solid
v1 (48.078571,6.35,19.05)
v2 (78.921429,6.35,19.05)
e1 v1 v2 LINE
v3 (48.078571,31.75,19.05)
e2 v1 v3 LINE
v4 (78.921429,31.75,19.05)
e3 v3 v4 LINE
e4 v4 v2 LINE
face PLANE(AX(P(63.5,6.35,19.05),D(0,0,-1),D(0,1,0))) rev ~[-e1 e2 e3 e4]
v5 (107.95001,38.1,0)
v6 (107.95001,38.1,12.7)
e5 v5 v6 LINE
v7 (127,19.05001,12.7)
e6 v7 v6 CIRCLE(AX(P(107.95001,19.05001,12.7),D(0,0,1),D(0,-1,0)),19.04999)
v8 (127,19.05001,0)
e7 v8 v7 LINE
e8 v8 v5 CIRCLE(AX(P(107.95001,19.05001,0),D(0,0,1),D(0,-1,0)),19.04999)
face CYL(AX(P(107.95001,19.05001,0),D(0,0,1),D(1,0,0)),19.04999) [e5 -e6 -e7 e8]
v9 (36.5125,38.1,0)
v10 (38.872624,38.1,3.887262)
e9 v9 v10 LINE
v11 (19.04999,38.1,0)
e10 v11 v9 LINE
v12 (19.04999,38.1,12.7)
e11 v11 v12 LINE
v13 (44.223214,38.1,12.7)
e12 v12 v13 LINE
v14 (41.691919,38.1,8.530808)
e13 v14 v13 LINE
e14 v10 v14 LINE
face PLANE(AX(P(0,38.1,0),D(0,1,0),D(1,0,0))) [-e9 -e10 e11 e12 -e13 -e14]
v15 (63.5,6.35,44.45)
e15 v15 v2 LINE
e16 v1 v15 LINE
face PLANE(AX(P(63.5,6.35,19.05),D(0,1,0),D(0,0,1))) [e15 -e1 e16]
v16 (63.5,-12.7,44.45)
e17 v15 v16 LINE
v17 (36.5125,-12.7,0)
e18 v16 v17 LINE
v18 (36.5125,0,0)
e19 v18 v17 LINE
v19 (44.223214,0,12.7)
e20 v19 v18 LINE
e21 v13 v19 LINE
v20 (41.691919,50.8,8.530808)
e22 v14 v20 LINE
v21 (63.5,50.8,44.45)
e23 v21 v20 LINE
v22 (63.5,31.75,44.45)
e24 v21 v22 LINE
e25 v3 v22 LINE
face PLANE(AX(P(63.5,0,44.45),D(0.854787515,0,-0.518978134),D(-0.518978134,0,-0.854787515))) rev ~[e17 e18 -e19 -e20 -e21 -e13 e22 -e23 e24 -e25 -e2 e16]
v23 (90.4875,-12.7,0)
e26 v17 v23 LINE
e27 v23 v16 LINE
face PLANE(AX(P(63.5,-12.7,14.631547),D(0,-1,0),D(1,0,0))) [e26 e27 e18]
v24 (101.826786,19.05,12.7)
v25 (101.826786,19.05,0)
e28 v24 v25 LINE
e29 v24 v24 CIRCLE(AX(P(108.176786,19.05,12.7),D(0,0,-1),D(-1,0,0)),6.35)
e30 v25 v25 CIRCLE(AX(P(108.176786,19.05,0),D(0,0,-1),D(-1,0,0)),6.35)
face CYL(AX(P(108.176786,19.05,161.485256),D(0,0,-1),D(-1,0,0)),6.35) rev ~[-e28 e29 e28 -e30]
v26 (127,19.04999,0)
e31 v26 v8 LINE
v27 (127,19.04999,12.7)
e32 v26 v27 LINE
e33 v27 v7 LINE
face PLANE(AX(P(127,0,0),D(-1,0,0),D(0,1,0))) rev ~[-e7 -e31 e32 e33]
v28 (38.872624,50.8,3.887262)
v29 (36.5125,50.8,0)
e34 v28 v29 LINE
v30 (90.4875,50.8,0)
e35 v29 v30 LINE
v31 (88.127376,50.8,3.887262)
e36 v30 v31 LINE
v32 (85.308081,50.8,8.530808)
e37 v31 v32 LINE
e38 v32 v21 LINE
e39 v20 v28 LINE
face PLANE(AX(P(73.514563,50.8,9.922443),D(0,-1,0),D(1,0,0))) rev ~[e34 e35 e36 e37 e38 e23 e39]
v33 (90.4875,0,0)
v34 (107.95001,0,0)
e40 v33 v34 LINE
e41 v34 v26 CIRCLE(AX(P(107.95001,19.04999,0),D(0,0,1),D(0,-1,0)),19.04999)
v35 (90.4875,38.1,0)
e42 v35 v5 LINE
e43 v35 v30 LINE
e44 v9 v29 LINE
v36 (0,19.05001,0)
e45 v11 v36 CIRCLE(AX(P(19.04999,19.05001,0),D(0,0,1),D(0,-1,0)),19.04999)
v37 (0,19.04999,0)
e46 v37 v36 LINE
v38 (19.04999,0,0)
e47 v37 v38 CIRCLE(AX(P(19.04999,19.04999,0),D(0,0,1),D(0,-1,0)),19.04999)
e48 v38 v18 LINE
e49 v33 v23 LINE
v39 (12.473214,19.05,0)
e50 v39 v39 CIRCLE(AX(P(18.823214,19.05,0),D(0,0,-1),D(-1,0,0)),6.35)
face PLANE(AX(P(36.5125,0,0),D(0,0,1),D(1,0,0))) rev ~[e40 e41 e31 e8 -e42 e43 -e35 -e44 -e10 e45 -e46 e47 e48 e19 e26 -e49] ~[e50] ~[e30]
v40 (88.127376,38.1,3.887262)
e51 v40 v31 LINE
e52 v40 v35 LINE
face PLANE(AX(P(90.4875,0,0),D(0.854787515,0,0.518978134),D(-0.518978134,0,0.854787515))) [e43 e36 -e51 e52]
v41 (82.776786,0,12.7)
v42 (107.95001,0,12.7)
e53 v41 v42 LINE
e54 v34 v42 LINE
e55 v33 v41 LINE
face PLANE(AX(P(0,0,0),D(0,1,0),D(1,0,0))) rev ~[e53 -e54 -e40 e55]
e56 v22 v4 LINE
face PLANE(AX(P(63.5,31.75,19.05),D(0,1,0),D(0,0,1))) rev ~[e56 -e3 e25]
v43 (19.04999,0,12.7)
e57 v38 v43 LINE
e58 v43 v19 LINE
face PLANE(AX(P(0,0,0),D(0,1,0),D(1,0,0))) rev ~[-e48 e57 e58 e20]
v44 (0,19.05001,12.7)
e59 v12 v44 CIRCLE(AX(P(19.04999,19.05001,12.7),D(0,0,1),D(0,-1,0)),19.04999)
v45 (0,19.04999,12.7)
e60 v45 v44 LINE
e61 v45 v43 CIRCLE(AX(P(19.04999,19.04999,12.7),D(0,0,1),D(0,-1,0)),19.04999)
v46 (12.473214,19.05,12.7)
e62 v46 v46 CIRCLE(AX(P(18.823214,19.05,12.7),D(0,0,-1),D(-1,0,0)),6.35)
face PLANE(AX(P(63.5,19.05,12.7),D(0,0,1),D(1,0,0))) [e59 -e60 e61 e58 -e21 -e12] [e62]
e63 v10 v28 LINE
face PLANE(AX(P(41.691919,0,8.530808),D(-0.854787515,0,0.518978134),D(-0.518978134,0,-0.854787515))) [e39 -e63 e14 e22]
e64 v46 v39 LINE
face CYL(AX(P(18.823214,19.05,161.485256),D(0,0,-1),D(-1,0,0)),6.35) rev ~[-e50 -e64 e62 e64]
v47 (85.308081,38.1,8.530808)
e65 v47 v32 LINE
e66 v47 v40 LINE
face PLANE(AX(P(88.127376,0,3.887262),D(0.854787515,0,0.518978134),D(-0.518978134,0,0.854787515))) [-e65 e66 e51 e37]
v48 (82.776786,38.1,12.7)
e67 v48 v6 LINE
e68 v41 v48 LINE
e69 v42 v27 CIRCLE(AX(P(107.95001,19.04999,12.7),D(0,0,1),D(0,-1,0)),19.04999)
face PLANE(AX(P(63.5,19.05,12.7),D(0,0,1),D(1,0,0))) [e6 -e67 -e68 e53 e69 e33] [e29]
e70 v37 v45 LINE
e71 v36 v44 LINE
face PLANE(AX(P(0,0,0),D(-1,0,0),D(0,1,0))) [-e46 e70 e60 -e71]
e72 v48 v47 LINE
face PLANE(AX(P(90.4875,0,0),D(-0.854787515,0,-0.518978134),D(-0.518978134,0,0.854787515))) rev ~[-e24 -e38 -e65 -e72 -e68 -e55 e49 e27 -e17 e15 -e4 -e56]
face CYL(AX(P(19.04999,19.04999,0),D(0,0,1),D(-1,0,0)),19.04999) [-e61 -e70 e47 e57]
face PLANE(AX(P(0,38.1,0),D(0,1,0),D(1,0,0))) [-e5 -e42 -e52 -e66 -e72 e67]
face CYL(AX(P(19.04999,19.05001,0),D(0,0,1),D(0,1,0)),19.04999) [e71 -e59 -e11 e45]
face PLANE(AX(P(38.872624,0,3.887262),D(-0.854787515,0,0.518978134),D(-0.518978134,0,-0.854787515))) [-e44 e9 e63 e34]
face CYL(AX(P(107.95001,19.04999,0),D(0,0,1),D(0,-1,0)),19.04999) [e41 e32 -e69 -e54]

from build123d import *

# Parameters (mm, degrees)
F0_W      = 127
F0_H      = 38.1
F1_DEPTH  = 12.7
F3_DEPTH  = 50.8
F5_DEPTH  = 12.7
F6_R      = 19.04999
F8_D      = 12.7
F11_D     = 12.7
F12_W     = 25.4
F12_H     = 25.4
F13_DEPTH = 25.4


# Not quite as in the source:
# - a fillet or chamfer is up to 0.001 mm smaller than in the source, because OpenCascade refuses the exact size


with BuildPart() as f1:
    # F0 (on Top) → F1 (new body)
    with BuildSketch(Plane.XY):
        with Locations((63.5, 19.05)):
            Rectangle(F0_W, F0_H)
    extrude(amount=F1_DEPTH)

    # F2 (on face) → F3 (join)
    with BuildSketch(Plane.XZ):
        Polygon((63.5, 12.7), (63.5, 6.35), (85.3080808081, 8.5308080808), (82.7767857143, 12.7), align=None)
        Polygon((85.3080808081, 8.5308080808), (63.5, 6.35), (88.1273764259, 3.8872623574), align=None)
        Polygon((63.5, 6.35), (63.5, 0), (90.4875, 0), (88.1273764259, 3.8872623574), align=None)
        Polygon((38.8726235741, 3.8872623574), (36.5125, 0), (63.5, 0), (63.5, 6.35), align=None)
        Polygon((41.6919191919, 8.5308080808), (38.8726235741, 3.8872623574), (63.5, 6.35), align=None)
        Polygon((63.5, 12.7), (44.2232142857, 12.7), (41.6919191919, 8.5308080808), (63.5, 6.35), align=None)
        Polygon((63.5, 44.45), (44.2232142857, 12.7), (63.5, 12.7), align=None)
        Polygon((63.5, 44.45), (63.5, 12.7), (82.7767857143, 12.7), align=None)
    extrude(amount=-F3_DEPTH)

    # F4 (on face) → F5 (join)
    with BuildSketch(Plane.XZ):
        Polygon((90.4875, 0), (63.5, 44.45), (36.5125, 0), align=None)
    extrude(amount=F5_DEPTH)

    # F6 (radius 19.05 in the source; OpenCascade refuses exactly that, so slightly less here)
    f6_edges = [f1.edges().sort_by_distance(p)[0] for p in [
        (0, 0, 6.35),
        (0, 38.1, 6.35),
        (127, 38.1, 6.35),
        (127, 0, 6.35),
    ]]
    fillet(f6_edges, radius=F6_R)

    # F8 (through all)
    with Locations(Plane.XY.offset(12.7)):
        with Locations((18.8232142857, 19.05)):
            Hole(F8_D / 2)

    # F11 (through all)
    with Locations(Plane.XY.offset(12.7)):
        with Locations((108.1767857143, 19.05)):
            Hole(F11_D / 2)

    # F12 (on offset) → F13 (cut, symmetric)
    with BuildSketch(Plane.YZ.offset(63.5)):
        with Locations((19.05, 31.75)):
            Rectangle(F12_W, F12_H)
    extrude(amount=F13_DEPTH, both=True, mode=Mode.SUBTRACT)


solid = f1.part
